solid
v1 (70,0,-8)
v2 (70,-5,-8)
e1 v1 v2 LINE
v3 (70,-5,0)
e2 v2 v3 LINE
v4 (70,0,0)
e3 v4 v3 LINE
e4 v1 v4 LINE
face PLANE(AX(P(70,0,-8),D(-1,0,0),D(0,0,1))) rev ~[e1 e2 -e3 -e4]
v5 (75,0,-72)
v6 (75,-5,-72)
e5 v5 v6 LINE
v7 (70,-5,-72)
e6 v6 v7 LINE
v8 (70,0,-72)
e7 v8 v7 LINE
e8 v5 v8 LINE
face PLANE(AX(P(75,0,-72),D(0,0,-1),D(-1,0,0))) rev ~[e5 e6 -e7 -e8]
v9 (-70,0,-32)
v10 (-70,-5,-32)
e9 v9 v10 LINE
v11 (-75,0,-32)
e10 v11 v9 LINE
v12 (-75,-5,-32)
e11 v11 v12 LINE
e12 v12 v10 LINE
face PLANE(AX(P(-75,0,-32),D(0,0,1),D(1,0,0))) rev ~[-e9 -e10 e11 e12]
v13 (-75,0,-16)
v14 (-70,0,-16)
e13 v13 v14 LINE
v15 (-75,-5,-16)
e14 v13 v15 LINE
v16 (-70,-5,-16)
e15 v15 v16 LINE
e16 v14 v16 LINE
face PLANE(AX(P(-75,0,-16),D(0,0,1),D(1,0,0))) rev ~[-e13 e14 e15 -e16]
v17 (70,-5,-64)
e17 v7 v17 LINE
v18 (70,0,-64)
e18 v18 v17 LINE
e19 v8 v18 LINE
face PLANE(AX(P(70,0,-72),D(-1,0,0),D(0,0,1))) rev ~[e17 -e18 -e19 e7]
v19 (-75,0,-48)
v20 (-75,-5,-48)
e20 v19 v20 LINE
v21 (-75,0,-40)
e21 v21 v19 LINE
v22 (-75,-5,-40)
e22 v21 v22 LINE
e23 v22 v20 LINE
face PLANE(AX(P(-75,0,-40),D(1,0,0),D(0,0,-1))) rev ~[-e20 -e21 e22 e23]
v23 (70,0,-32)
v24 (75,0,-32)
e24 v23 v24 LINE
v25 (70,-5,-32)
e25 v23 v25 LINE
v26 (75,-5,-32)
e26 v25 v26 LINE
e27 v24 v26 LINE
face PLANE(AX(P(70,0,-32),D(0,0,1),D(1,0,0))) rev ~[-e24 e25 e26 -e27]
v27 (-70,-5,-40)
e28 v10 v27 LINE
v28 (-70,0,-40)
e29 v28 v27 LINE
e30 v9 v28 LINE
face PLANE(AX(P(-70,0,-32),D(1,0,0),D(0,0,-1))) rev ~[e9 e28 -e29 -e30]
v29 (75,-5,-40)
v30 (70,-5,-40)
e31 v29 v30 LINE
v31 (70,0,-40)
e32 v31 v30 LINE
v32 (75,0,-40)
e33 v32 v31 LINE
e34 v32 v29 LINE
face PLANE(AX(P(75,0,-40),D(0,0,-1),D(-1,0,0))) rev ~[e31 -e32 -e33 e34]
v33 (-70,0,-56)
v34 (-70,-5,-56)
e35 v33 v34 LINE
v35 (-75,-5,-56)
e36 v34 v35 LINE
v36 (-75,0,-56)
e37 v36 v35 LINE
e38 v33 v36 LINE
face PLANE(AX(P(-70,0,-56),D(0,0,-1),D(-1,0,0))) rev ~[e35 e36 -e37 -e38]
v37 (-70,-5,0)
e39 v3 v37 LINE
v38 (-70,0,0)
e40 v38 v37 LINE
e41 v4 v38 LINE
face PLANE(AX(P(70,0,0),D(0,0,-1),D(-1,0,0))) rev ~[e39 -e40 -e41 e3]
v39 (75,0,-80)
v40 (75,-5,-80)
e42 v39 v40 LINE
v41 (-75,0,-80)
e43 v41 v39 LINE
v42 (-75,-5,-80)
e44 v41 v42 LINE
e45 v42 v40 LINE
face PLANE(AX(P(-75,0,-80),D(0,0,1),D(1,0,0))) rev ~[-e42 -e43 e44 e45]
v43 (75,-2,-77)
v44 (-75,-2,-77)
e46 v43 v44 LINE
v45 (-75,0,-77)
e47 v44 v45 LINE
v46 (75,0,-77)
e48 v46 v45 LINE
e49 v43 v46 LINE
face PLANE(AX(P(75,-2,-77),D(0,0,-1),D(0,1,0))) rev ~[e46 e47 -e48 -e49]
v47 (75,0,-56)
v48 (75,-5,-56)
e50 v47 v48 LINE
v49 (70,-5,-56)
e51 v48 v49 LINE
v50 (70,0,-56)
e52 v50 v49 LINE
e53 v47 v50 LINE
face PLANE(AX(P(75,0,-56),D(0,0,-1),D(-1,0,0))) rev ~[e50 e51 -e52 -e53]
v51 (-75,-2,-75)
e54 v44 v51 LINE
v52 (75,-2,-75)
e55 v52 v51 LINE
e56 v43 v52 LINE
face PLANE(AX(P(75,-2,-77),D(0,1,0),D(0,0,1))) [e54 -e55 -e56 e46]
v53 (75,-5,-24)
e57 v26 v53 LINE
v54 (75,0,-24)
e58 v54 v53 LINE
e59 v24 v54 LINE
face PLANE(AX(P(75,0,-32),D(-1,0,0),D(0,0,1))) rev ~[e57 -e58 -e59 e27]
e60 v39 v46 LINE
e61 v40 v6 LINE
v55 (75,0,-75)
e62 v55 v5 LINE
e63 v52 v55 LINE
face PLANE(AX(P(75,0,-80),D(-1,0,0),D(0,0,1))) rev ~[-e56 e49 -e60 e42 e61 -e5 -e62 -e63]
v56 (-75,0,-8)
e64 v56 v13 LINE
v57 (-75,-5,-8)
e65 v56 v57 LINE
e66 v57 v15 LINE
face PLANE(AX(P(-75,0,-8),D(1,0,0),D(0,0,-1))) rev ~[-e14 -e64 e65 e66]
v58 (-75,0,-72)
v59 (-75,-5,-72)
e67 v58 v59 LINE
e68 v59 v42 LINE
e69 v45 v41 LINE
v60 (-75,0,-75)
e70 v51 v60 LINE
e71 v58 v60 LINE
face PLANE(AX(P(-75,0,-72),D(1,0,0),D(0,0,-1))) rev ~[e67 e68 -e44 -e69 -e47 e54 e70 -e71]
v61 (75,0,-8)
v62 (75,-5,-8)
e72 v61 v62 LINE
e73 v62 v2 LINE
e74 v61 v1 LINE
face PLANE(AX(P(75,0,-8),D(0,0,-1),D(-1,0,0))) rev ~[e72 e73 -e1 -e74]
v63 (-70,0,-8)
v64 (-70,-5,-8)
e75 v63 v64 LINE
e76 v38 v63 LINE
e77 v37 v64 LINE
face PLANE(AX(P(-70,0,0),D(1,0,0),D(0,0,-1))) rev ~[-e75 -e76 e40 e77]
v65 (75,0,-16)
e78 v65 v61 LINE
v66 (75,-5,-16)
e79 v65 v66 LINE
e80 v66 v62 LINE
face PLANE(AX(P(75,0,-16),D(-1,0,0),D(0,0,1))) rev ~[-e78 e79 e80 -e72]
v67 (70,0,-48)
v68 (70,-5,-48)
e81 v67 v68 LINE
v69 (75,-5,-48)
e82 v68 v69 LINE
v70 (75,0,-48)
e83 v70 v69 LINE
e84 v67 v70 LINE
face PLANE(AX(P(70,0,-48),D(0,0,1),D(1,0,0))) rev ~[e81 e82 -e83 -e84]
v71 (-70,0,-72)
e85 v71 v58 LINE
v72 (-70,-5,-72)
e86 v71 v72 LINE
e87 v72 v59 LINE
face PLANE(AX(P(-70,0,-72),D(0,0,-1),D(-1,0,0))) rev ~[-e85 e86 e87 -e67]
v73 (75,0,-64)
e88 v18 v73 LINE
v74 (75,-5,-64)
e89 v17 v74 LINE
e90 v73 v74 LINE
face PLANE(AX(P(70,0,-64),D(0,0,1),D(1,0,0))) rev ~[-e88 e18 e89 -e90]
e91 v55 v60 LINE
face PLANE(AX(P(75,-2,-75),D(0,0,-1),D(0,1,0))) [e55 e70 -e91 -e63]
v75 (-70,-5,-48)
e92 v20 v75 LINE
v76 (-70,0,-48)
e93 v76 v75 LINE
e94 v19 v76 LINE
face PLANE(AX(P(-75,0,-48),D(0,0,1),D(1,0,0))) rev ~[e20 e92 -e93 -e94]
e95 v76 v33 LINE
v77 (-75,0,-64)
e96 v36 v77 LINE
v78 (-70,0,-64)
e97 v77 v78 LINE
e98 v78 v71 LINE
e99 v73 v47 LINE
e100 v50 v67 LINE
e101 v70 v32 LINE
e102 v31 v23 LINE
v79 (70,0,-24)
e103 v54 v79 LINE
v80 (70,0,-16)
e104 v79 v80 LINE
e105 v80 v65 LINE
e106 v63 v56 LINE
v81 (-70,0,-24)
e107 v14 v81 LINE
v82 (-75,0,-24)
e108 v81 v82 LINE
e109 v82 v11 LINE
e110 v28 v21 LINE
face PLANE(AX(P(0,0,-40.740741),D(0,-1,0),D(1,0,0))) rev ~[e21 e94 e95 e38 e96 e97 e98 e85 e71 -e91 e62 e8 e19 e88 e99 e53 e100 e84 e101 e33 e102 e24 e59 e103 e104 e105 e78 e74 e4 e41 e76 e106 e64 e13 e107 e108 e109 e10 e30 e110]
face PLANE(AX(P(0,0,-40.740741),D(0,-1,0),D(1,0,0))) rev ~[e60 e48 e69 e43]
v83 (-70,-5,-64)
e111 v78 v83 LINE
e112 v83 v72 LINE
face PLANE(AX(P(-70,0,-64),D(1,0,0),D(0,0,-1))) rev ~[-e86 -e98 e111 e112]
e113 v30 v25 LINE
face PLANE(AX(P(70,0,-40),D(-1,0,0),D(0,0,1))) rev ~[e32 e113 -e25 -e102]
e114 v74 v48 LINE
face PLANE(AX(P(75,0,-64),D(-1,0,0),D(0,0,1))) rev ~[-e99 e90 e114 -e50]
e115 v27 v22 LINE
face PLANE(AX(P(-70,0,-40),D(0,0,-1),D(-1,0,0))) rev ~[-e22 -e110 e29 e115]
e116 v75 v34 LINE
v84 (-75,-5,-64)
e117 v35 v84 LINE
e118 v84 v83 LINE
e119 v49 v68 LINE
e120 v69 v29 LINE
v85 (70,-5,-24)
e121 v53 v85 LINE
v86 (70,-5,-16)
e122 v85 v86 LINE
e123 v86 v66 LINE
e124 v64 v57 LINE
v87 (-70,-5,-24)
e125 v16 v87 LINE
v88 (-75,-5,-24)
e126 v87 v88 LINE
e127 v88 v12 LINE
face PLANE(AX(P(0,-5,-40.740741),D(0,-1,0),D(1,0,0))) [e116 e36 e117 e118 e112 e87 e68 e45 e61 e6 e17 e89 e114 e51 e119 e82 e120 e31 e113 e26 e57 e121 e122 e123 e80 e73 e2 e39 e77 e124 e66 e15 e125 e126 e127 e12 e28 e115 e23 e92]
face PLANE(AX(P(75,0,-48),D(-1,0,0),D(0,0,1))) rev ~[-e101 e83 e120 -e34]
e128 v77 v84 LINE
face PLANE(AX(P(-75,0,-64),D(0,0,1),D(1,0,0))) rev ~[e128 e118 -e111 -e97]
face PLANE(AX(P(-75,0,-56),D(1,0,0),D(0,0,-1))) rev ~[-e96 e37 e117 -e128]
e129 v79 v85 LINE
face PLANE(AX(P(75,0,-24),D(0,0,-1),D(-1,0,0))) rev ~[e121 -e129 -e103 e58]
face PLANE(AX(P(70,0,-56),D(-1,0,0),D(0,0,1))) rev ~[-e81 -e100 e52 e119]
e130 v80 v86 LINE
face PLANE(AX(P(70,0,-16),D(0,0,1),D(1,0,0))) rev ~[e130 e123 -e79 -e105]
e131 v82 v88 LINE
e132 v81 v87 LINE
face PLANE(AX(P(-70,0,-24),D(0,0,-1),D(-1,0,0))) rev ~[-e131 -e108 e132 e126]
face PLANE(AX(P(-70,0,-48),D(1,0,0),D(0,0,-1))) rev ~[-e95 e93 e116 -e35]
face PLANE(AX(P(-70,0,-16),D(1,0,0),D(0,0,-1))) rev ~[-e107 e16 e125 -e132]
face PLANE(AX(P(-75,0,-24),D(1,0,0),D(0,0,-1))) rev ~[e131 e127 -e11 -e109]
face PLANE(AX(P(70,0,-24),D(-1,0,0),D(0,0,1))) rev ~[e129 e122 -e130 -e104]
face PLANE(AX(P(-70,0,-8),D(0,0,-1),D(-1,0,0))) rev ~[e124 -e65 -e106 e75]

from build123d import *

# Parameters (mm, degrees)
F2_DEPTH = 5
F3_W     = 2
F3_H     = 2
F4_DEPTH = 150.001


# Not quite as in the source:
# - a feature names something its author has since deleted; it is built from what else it names


with BuildPart() as f2:
    # F1 (on Front) → F2 (new body)
    with BuildSketch(Plane.XZ):
        Polygon((70, -8), (70, 0), (-70, 0), (-70, -8), (-75, -8), (-75, -16), (-70, -16), (-70, -24), (-75, -24), (-75, -32), (-70, -32), (-70, -40), (-75, -40), (-75, -48), (-70, -48), (-70, -56), (-75, -56), (-75, -64), (-70, -64), (-70, -72), (-75, -72), (-75, -80), (75, -80), (75, -72), (70, -72), (70, -64), (75, -64), (75, -56), (70, -56), (70, -48), (75, -48), (75, -40), (70, -40), (70, -32), (75, -32), (75, -24), (70, -24), (70, -16), (75, -16), (75, -8), align=None)
    extrude(amount=F2_DEPTH)

    # F3 (on face) → F4 (cut, through all)
    with BuildSketch(Plane.YZ.offset(75)):
        with Locations((-1, -76)):
            Rectangle(F3_W, F3_H)
    extrude(amount=-F4_DEPTH, mode=Mode.SUBTRACT)


solid = f2.part
